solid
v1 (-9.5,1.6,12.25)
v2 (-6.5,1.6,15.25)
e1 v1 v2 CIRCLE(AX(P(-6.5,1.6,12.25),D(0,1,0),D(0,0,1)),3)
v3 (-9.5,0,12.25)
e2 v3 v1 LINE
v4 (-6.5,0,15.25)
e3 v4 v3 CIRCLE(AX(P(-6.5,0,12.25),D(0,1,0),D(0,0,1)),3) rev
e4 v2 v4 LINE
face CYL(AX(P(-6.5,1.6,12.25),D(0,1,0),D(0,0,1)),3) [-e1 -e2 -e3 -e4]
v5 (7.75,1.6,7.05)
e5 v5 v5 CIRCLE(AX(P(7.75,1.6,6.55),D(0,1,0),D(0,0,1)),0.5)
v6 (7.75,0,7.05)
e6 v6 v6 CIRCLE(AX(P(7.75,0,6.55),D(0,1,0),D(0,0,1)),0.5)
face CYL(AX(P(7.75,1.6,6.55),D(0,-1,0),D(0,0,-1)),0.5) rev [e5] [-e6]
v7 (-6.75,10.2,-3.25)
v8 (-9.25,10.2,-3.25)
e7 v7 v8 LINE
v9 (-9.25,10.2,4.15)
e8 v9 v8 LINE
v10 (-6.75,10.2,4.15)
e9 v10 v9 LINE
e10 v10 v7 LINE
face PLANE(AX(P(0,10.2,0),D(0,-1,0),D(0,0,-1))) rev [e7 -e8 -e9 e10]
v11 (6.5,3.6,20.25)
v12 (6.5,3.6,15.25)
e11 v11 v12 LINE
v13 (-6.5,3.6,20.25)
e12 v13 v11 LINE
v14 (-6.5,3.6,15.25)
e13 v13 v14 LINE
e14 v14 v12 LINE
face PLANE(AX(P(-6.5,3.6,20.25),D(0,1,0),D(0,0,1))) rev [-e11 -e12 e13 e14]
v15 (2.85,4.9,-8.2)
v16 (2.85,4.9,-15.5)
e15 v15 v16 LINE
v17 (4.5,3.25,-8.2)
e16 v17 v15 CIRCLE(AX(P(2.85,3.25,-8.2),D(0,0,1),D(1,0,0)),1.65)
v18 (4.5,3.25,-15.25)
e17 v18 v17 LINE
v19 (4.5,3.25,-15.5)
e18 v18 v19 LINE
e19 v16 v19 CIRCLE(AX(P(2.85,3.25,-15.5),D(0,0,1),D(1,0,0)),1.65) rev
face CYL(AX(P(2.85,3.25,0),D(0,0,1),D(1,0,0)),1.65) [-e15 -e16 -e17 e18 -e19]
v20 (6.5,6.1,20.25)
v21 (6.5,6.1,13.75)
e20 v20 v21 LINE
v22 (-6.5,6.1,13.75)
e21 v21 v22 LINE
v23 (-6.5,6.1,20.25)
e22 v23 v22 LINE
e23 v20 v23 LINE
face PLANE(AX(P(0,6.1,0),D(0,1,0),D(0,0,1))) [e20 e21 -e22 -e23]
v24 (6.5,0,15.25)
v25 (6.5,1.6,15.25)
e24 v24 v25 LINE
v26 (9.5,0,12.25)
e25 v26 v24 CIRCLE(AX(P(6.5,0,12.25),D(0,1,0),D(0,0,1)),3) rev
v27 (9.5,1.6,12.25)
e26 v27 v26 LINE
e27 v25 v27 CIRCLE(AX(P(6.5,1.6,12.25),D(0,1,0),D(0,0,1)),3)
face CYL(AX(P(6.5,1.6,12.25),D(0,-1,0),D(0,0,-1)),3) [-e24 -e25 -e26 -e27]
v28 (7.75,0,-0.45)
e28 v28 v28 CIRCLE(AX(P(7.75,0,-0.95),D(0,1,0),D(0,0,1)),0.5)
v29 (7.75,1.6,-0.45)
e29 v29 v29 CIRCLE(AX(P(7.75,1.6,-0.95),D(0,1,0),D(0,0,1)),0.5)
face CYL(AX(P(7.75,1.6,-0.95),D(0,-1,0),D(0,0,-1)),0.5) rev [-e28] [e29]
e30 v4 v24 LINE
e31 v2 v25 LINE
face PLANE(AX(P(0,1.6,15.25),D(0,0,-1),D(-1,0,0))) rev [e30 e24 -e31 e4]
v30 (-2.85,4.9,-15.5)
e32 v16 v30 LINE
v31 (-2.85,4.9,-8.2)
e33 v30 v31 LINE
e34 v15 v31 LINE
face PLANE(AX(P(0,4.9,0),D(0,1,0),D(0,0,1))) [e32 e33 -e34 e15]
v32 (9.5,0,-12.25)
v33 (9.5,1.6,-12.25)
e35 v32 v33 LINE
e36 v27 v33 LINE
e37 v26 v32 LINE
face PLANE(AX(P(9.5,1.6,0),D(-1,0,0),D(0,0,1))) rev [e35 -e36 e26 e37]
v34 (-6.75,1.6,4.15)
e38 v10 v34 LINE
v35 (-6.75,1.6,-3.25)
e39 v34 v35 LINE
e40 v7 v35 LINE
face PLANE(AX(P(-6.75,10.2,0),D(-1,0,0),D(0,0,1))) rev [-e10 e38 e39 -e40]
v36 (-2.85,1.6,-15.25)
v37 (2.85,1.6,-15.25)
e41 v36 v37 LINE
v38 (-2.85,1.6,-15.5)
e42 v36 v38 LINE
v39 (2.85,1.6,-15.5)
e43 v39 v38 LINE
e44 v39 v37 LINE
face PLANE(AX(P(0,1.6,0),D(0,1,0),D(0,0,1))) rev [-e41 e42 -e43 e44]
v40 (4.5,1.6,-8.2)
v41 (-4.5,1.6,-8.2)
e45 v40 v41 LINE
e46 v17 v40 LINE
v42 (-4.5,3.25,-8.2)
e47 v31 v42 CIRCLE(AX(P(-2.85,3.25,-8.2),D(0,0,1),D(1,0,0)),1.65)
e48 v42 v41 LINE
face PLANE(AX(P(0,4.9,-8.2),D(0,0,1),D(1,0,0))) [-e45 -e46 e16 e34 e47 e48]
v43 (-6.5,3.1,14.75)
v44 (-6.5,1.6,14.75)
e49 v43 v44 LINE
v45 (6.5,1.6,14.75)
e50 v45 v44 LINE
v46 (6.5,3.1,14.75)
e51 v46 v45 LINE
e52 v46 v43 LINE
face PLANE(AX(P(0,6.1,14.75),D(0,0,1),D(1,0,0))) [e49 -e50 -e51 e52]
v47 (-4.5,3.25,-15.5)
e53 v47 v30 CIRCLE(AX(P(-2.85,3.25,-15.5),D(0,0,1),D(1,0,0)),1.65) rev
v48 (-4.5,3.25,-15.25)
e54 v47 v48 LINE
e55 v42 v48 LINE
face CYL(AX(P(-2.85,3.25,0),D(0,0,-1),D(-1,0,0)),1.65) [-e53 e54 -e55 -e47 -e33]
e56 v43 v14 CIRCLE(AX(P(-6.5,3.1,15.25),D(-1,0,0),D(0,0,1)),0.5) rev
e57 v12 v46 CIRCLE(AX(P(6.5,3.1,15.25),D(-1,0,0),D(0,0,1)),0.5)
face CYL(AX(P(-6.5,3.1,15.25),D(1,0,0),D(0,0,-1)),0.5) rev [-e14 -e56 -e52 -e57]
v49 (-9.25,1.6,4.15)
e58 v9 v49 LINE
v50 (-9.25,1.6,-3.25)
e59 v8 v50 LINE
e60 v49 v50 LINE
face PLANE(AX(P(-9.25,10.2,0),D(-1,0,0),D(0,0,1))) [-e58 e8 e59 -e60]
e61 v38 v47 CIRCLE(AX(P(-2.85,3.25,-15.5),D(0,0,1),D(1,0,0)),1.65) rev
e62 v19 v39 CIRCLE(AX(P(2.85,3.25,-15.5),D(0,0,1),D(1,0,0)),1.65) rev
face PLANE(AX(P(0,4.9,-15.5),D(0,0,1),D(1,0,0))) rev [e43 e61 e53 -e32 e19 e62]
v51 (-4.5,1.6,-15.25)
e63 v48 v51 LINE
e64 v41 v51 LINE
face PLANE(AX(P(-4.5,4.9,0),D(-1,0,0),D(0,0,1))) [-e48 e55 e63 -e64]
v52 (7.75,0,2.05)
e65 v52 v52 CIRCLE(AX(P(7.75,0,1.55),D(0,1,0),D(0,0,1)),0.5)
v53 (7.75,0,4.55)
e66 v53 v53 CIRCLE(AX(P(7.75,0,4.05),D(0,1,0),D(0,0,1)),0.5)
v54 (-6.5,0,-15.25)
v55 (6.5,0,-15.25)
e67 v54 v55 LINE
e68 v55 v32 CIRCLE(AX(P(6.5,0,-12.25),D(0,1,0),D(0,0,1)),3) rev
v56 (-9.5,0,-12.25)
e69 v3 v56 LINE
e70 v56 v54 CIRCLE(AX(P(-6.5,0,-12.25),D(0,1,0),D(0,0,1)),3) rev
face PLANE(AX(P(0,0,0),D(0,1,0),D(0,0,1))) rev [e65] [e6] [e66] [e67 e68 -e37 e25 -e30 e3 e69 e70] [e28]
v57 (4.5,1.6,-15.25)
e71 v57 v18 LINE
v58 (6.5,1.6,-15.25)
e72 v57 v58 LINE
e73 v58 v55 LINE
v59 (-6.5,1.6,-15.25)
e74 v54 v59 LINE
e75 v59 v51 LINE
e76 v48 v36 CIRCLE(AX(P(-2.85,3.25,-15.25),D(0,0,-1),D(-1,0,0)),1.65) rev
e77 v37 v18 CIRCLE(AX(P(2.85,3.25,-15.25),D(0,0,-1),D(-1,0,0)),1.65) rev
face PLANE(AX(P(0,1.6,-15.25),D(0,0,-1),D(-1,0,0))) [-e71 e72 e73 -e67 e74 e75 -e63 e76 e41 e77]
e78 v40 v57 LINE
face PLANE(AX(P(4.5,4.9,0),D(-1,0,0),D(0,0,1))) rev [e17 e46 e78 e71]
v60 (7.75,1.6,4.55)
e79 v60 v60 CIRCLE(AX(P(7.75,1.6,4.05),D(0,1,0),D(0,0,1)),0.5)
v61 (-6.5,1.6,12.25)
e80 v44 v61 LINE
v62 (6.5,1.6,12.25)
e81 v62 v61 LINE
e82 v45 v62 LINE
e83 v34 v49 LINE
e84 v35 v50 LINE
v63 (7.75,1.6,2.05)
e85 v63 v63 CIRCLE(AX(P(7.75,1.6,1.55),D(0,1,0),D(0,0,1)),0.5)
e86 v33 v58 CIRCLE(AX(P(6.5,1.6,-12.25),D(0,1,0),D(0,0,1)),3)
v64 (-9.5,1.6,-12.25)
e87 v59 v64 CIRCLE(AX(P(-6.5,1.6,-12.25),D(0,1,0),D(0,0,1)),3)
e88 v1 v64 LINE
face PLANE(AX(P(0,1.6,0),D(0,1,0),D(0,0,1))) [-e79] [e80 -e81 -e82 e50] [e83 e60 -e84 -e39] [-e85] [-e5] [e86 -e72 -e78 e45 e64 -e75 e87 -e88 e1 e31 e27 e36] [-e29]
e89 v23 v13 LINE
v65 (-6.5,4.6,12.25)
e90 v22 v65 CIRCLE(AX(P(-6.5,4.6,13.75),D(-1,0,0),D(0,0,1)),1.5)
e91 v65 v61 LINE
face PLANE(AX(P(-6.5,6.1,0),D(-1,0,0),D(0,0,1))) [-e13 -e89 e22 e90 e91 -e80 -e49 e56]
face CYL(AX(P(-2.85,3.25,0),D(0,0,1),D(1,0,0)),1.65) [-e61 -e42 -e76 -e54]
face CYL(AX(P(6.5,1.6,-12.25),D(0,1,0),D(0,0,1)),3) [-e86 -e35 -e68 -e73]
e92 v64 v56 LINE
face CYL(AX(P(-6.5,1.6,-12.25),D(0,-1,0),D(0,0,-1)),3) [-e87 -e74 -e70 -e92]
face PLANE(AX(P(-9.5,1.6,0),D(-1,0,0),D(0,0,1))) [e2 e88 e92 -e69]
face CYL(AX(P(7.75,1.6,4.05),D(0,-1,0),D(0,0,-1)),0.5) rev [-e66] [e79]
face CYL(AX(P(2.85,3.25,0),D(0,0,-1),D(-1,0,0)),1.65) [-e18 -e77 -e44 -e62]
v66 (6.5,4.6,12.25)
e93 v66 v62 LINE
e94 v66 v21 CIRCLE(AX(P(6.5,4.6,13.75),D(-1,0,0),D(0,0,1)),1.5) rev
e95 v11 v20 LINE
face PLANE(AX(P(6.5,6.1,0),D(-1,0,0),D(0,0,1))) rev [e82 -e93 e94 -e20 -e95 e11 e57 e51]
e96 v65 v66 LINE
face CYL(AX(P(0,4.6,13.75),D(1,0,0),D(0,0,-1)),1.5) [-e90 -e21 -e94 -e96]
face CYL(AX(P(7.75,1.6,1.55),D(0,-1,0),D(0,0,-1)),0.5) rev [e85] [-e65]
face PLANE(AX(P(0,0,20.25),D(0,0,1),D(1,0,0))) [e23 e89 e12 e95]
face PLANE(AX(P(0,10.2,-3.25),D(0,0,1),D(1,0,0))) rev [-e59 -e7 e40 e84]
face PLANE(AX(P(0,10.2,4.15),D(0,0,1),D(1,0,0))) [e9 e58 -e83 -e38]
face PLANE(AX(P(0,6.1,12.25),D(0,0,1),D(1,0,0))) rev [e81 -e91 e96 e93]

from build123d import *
from OCP.BRepFilletAPI import BRepFilletAPI_MakeFillet

# Parameters (mm, degrees)
SKETCH1_W           = 19
SKETCH1_H           = 30.5
SKETCH1_R           = 0.5
PCB_DEPTH           = 1.6
PCB_FILLET_R        = 3
USB_START           = 1.6
SKETCH1_3_W         = 9
SKETCH1_3_H         = 7.05
SKETCH1_3_H_2       = 0.25
USB_C_DEPTH         = 3.3
USB_C_FILLET_R      = 1.65
POWER_START         = 1.6
SKETCH1_4_W         = 2.5
SKETCH1_4_H         = 7.4
POWER_JUMPERS_DEPTH = 8.6
UART_START          = 1.6
SKETCH1_5_W         = 13
SKETCH1_5_H         = 2.5
UART_TO_BOARD_DEPTH = 4.5
SKETCH3_W           = 13
SKETCH3_H           = 2.5
UART_PINS_DEPTH     = 5.5
UART_FILLET_R1      = 1.5
UART_FILLET_R2      = 0.5
LPATTERN1_OUTLINE_R = 0.5
LPATTERN1_DEPTH     = 1.6


# Read off the part's stored shape, not the designer's step: LPattern1
with BuildPart() as part:
    # Sketch1 → PCB (new body)
    with BuildSketch(Plane(origin=(0, 0, 0), x_dir=(1, 0, 0), z_dir=(0, 1, 0))):
        Rectangle(SKETCH1_W, SKETCH1_H)
        with Locations(Location((7.75, 0.95, 0), (0, 0, 270))):
            Circle(SKETCH1_R, mode=Mode.SUBTRACT)
    extrude(amount=PCB_DEPTH)

    # PCB Fillet
    pcb_fillet_edges = [part.edges().sort_by_distance(p)[0] for p in [
        (9.5, 0.8, -15.25),
        (9.5, 0.8, 15.25),
        (-9.5, 0.8, 15.25),
        (-9.5, 0.8, -15.25),
    ]]
    fillet(pcb_fillet_edges, radius=PCB_FILLET_R)

    # Sketch1<3> → USB C (add)
    with BuildSketch(Plane(origin=(0, 0, 0), x_dir=(1, 0, 0), z_dir=(0, 1, 0)).offset(USB_START)):
        with Locations((0, 11.725)):
            Rectangle(SKETCH1_3_W, SKETCH1_3_H)
        with Locations((0, 15.375)):
            Rectangle(SKETCH1_3_W, SKETCH1_3_H_2)
    extrude(amount=USB_C_DEPTH)

    # USB C Fillet
    usb_c_fillet_edges = [part.edges().sort_by_distance(p)[0] for p in [
        (-4.5, 4.9, -11.85),
        (-4.5, 1.6, -15.375),
        (4.5, 4.9, -11.85),
        (4.5, 1.6, -15.375),
    ]]
    fillet(usb_c_fillet_edges, radius=USB_C_FILLET_R - 0.0001)  # a hair under: the kernel refuses the full size

    # Sketch1<4> → Power Jumpers (add)
    with BuildSketch(Plane(origin=(0, 0, 0), x_dir=(1, 0, 0), z_dir=(0, 1, 0)).offset(POWER_START)):
        with Locations((-8, -0.45)):
            Rectangle(SKETCH1_4_W, SKETCH1_4_H)
    extrude(amount=POWER_JUMPERS_DEPTH)

    # Sketch1<5> → UART To Board (add)
    with BuildSketch(Plane(origin=(0, 0, 0), x_dir=(1, 0, 0), z_dir=(0, 1, 0)).offset(UART_START)):
        with Locations((0, -13.5)):
            Rectangle(SKETCH1_5_W, SKETCH1_5_H)
    extrude(amount=UART_TO_BOARD_DEPTH)

    # Sketch3 → UART Pins (add)
    with BuildSketch(Plane.XY.offset(14.75)):
        with Locations((0, 4.85)):
            Rectangle(SKETCH3_W, SKETCH3_H)
    extrude(amount=UART_PINS_DEPTH)

    # UART Fillet: one fillet with a radius per group of edges: ONE call of the kernel's fillet builder (fillet() takes one radius for all edges)
    uart_fillet_edges_1 = [part.edges().sort_by_distance(p)[0] for p in [
        (0, 6.1, 12.25),
    ]]
    uart_fillet_edges_2 = [part.edges().sort_by_distance(p)[0] for p in [
        (0, 3.6, 14.75),
    ]]
    uart_fillet = BRepFilletAPI_MakeFillet(part.part.solid().wrapped)
    for e in uart_fillet_edges_1:
        uart_fillet.Add(UART_FILLET_R1, e.wrapped)
    for e in uart_fillet_edges_2:
        uart_fillet.Add(UART_FILLET_R2, e.wrapped)
    add(Compound.cast(uart_fillet.Shape()), mode=Mode.REPLACE)

    # LPattern1 outline → LPattern1 (cut)
    with BuildSketch(Plane(origin=(0, 0, 0), x_dir=(1, 0, 0), z_dir=(0, 1, 0))):
        with Locations((7.75, -6.55)):
            Circle(LPATTERN1_OUTLINE_R)
        with Locations((7.75, -4.05)):
            Circle(LPATTERN1_OUTLINE_R)
        with Locations((7.75, -1.55)):
            Circle(LPATTERN1_OUTLINE_R)
    extrude(amount=LPATTERN1_DEPTH, mode=Mode.SUBTRACT)


solid = part.part
